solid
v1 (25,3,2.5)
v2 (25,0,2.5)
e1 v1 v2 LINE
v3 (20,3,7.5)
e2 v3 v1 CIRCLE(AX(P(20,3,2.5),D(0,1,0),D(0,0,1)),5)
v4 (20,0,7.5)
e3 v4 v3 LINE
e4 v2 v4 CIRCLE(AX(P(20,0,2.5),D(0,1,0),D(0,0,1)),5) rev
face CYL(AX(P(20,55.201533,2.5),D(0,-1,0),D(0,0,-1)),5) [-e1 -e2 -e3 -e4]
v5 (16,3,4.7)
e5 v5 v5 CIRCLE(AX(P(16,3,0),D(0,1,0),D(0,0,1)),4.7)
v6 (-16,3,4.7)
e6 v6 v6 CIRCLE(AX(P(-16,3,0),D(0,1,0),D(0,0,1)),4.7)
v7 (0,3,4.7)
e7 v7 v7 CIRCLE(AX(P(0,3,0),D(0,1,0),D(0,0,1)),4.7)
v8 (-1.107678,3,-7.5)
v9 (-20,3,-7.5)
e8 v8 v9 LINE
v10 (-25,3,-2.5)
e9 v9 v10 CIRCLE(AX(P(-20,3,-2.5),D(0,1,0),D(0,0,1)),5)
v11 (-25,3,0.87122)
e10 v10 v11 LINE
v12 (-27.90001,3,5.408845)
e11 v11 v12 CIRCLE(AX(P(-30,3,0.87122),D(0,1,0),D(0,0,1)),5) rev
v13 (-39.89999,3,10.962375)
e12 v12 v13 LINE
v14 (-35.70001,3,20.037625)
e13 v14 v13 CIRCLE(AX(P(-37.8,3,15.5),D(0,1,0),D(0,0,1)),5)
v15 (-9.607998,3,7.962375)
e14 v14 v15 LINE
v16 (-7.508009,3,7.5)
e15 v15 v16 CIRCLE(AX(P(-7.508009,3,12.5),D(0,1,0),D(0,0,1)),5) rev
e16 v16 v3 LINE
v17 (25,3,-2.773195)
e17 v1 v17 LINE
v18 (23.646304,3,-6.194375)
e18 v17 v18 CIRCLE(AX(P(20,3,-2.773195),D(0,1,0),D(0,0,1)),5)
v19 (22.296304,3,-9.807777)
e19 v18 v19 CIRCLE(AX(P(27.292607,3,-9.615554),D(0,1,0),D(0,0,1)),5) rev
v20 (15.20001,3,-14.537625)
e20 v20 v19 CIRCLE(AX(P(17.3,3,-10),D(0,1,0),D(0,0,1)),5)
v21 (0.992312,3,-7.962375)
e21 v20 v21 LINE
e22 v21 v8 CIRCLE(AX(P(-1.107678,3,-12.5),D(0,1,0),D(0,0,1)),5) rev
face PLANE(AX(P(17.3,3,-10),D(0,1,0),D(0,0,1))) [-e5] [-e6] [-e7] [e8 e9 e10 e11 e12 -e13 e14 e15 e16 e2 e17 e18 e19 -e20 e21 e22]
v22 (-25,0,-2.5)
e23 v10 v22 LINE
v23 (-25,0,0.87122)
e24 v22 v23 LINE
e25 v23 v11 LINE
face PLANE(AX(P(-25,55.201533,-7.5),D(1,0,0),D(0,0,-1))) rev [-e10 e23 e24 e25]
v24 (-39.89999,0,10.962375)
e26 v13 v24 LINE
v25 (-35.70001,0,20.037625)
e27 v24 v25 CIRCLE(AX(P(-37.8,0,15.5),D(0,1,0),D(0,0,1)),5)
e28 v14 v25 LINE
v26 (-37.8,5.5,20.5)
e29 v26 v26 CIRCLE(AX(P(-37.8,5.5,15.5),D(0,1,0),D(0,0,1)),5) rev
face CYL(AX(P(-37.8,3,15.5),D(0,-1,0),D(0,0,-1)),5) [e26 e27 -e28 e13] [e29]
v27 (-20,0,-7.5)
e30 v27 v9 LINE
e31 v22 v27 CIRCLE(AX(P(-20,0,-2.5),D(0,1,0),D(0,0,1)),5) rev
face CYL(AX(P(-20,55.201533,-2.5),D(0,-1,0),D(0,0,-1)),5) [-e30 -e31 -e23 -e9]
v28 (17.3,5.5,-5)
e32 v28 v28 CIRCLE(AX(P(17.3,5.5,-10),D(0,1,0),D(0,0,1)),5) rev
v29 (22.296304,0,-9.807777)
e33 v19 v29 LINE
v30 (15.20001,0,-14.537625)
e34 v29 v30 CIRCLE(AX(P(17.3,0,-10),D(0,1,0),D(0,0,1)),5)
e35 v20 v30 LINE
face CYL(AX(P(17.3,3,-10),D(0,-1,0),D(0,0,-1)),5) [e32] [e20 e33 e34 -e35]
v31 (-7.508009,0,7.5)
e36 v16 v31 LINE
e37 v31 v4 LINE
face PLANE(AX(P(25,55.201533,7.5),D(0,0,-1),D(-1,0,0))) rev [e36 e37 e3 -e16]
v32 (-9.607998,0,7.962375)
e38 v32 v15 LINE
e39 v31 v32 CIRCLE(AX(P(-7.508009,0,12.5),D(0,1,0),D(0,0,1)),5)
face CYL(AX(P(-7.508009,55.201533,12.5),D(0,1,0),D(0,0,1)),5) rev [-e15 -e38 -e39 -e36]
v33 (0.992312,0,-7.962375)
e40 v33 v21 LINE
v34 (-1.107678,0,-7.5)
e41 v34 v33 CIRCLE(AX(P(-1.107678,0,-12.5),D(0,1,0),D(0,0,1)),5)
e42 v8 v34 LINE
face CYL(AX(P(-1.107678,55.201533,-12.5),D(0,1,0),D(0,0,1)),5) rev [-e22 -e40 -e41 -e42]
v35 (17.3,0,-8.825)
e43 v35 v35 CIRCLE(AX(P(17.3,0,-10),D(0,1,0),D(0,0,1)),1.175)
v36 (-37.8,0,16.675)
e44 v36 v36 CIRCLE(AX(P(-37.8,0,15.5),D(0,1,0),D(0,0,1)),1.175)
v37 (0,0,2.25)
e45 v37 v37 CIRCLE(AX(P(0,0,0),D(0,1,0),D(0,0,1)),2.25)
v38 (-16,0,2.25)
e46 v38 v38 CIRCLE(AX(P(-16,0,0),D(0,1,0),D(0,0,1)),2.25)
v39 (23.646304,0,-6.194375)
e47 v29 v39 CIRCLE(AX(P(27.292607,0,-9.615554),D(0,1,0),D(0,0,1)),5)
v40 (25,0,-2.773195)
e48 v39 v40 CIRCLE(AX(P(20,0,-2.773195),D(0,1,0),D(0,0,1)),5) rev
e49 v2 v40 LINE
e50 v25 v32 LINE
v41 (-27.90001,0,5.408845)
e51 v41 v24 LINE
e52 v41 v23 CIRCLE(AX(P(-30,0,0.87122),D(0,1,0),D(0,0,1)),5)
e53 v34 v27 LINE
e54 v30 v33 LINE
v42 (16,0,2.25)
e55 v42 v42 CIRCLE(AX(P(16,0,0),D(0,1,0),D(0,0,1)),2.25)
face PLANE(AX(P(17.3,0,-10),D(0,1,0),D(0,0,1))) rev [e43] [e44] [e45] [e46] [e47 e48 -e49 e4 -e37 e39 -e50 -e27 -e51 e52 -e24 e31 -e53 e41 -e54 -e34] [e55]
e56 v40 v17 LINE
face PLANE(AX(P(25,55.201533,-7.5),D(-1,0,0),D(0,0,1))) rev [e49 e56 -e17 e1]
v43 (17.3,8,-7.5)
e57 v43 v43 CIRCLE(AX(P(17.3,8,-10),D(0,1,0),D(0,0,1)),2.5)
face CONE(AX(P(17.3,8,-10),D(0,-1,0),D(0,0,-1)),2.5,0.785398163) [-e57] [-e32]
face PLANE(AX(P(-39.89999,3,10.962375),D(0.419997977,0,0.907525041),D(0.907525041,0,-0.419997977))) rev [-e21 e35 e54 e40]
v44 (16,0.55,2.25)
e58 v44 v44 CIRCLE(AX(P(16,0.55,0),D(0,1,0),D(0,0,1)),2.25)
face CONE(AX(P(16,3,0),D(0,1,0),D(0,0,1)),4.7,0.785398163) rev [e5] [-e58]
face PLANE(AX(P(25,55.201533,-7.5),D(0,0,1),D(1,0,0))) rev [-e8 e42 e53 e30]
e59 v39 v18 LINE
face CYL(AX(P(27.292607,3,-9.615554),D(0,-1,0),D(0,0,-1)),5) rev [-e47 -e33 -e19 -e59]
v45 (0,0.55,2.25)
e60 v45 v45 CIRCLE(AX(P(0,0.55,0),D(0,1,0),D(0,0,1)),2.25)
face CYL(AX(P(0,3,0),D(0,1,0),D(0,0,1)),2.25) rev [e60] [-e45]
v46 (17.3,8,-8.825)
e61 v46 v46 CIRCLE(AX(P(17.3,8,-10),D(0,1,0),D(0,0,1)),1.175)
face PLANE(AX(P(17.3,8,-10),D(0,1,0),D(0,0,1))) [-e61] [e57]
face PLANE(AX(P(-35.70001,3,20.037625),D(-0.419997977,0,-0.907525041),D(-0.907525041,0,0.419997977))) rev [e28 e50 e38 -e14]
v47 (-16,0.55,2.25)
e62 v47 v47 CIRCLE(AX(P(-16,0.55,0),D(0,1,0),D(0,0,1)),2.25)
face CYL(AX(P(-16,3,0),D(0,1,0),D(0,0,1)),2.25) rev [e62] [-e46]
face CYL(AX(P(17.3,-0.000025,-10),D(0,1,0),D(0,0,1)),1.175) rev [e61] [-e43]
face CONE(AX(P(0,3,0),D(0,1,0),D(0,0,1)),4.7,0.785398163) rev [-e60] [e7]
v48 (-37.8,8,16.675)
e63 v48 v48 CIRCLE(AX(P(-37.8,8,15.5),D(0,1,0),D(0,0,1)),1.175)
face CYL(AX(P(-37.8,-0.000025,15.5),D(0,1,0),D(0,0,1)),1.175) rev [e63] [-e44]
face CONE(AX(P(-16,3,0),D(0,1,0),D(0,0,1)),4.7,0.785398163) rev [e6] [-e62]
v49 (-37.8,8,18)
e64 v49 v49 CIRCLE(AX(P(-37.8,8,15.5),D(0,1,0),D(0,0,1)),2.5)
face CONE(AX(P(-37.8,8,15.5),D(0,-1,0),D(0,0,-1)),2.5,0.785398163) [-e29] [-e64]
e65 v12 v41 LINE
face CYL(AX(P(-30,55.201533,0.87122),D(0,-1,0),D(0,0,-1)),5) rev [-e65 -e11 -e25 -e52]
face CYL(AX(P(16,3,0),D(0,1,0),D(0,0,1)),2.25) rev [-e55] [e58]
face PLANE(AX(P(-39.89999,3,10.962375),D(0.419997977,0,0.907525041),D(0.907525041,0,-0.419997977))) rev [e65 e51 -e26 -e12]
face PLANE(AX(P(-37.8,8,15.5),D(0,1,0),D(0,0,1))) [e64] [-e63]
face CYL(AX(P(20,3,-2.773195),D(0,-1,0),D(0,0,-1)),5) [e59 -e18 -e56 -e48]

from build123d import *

# Parameters (mm, degrees)
BOSS_EXTRUDE2_DEPTH                          = 3
SKETCH4_W                                    = 50
SKETCH4_H                                    = 15
BOSS_EXTRUDE3_DEPTH                          = 3
SKETCH6_R                                    = 5
BOSS_EXTRUDE4_DEPTH                          = 5
FILLET1_R                                    = 5
FILLET2_R                                    = 5
CSK_FOR_M4_COUNTERSUNK_FLAT_HEAD_SCR_2_COUNT = 2
CSK_FOR_M4_COUNTERSUNK_FLAT_HEAD_SCR_2_PITCH = 16
CSK_FOR_M4_COUNTERSUNK_FLAT_HEAD_SCR_3_COUNT = 2
CSK_FOR_M4_COUNTERSUNK_FLAT_HEAD_SCR_3_PITCH = 16
SKETCH9_R                                    = 1.175
CUT_EXTRUDE2_DEPTH                           = 49.125772869
CHAMFER1_SIZE                                = 2.5


with BuildPart() as part:
    # Sketch2 → Boss-Extrude2 (new body)
    with BuildSketch(Plane(origin=(0, 0, 0), x_dir=(1, 0, 0), z_dir=(0, 1, 0))):
        with BuildLine():
            Line((-35.700010115, -20.037625203), (19.399989885, 5.462374797))
            ThreePointArc((19.399989885, 5.462374797), (21.837625203, 12.099989885), (15.200010115, 14.537625203))
            Line((15.200010115, 14.537625203), (-39.899989885, -10.962374797))
            ThreePointArc((-39.899989885, -10.962374797), (-42.337625203, -17.599989885), (-35.700010115, -20.037625203))
        make_face()
    extrude(amount=BOSS_EXTRUDE2_DEPTH)

    # Sketch4 → Boss-Extrude3 (add)
    with BuildSketch(Plane(origin=(0, 0, 0), x_dir=(1, 0, 0), z_dir=(0, 1, 0))):
        Rectangle(SKETCH4_W, SKETCH4_H)
    extrude(amount=BOSS_EXTRUDE3_DEPTH)

    # Sketch6 → Boss-Extrude4 (add)
    with BuildSketch(Plane(origin=(0, 3, 0), x_dir=(1, 0, 0), z_dir=(0, 1, 0))):
        with Locations(Location((-37.8, -15.5, 0), (0, 0, 114.834459772))):
            Circle(SKETCH6_R)
        with Locations(Location((17.3, 10, 0), (0, 0, 114.834459772))):
            Circle(SKETCH6_R)
    extrude(amount=BOSS_EXTRUDE4_DEPTH)

    # Fillet1
    # the kernel refuses this fillet: 5 mm, written as the material it adds along each edge
    with BuildSketch(Plane(origin=(-25, 0, 4.066735195), x_dir=(0, 0, -1), z_dir=(0, 1, 0))) as fillet1_piece_1:
        with BuildLine():
            CenterArc((FILLET1_R * 0.639103051734, FILLET1_R), FILLET1_R, 204.834459772, 65.165540228)
            Line((-FILLET1_R * 0.268421988848, FILLET1_R * 0.580002022961), (0, 0))
            Line((0, 0), (FILLET1_R * 0.639103051734, 0))
        make_face()
    extrude(amount=3)
    with BuildSketch(Plane(origin=(-0.00678003, 3, -7.5), x_dir=(0.9075250405819563, 0, -0.419997977038841), z_dir=(0, -1, 0)), Plane(origin=(-8.608906245, 3, 7.5), x_dir=(-0.9075250405819576, 0, 0.41999797703883784), z_dir=(0, -1, 0))) as fillet1_piece_2:
        with BuildLine():
            CenterArc((FILLET1_R * 0.220179535316, -FILLET1_R), FILLET1_R, 90, 24.834459772)
            Line((-FILLET1_R * 0.199818441723, -FILLET1_R * 0.092474959418), (0, 0))
            Line((0, 0), (FILLET1_R * 0.220179535316, 0))
        make_face()
    extrude(amount=3)
    # the kernel refuses this fillet: 5 mm, written as the material it takes off along each edge
    with BuildSketch(Plane(origin=(25, -11.817012604, -7.5), x_dir=(0, 0, 1), z_dir=(0, 1, 0))) as fillet1_2_piece_1:
        with BuildLine():
            CenterArc((4.726805042, -5), FILLET1_R, 90, 70.972289662)
            Line((0, -3.369872981), (0, 0))
            Line((0, 0), (4.726805042, 0))
        make_face()
    extrude(amount=26.634025208, mode=Mode.SUBTRACT)
    with BuildSketch(Plane(origin=(-25, -12.5, -7.5), x_dir=(1, 0, 0), z_dir=(0, 1, 0)), Plane(origin=(25, -12.5, 7.5), x_dir=(-1, 0, 0), z_dir=(0, 1, 0))) as fillet1_2_piece_2:
        with BuildLine():
            CenterArc((FILLET1_R, -FILLET1_R), FILLET1_R, 90, 90)
            Line((0, -FILLET1_R), (0, 0))
            Line((0, 0), (FILLET1_R, 0))
        make_face()
    extrude(amount=28, mode=Mode.SUBTRACT)

    # Fillet2
    fillet2_edges = [part.edges().sort_by_distance(p)[0] for p in [
        (21.630127019, 1.5, -7.5),
    ]]
    fillet(fillet2_edges, radius=FILLET2_R)

    # Sketch7 → CSK for M4 Countersunk Flat Head Screw1 (revolve, cut)
    with BuildSketch(Plane(origin=(0, 3, 0), x_dir=(0, 0, 1), z_dir=(1, 0, 0))):
        Polygon((0, 0), (0, 3.000025), (2.25, 3.000025), (2.25, 2.45), (4.7, 0), align=None)
    csk_for_m4_countersunk_flat_head_screw1 = revolve(axis=Axis((0, 9.35, 0), (0, -1, 0)), mode=Mode.SUBTRACT)

    # CSK for M4 Countersunk Flat Head Scr 2: CSK for M4 Countersunk Flat Head Screw1 ×2
    with Locations(*[(-i * CSK_FOR_M4_COUNTERSUNK_FLAT_HEAD_SCR_2_PITCH, 0, 0) for i in range(1, CSK_FOR_M4_COUNTERSUNK_FLAT_HEAD_SCR_2_COUNT)]):
        add(csk_for_m4_countersunk_flat_head_screw1, mode=Mode.SUBTRACT)

    # CSK for M4 Countersunk Flat Head Scr 3: CSK for M4 Countersunk Flat Head Screw1 ×2
    with Locations(*[(i * CSK_FOR_M4_COUNTERSUNK_FLAT_HEAD_SCR_3_PITCH, 0, 0) for i in range(1, CSK_FOR_M4_COUNTERSUNK_FLAT_HEAD_SCR_3_COUNT)]):
        add(csk_for_m4_countersunk_flat_head_screw1, mode=Mode.SUBTRACT)

    # Sketch9 → Cut-Extrude2 (cut, through all)
    with BuildSketch(Plane(origin=(0, 8, 0), x_dir=(1, 0, 0), z_dir=(0, 1, 0))):
        with Locations(Location((-37.8, -15.5, 0), (0, 0, 270))):
            Circle(SKETCH9_R)
        with Locations(Location((17.3, 10, 0), (0, 0, 270))):
            Circle(SKETCH9_R)
    extrude(amount=-CUT_EXTRUDE2_DEPTH, mode=Mode.SUBTRACT)

    # Chamfer1
    chamfer1_edges = [part.edges().sort_by_distance(p)[0] for p in [
        (-35.700010115, 8, 20.037625203),
        (19.399989885, 8, -5.462374797),
    ]]
    chamfer(chamfer1_edges, length=CHAMFER1_SIZE)


solid = part.part
